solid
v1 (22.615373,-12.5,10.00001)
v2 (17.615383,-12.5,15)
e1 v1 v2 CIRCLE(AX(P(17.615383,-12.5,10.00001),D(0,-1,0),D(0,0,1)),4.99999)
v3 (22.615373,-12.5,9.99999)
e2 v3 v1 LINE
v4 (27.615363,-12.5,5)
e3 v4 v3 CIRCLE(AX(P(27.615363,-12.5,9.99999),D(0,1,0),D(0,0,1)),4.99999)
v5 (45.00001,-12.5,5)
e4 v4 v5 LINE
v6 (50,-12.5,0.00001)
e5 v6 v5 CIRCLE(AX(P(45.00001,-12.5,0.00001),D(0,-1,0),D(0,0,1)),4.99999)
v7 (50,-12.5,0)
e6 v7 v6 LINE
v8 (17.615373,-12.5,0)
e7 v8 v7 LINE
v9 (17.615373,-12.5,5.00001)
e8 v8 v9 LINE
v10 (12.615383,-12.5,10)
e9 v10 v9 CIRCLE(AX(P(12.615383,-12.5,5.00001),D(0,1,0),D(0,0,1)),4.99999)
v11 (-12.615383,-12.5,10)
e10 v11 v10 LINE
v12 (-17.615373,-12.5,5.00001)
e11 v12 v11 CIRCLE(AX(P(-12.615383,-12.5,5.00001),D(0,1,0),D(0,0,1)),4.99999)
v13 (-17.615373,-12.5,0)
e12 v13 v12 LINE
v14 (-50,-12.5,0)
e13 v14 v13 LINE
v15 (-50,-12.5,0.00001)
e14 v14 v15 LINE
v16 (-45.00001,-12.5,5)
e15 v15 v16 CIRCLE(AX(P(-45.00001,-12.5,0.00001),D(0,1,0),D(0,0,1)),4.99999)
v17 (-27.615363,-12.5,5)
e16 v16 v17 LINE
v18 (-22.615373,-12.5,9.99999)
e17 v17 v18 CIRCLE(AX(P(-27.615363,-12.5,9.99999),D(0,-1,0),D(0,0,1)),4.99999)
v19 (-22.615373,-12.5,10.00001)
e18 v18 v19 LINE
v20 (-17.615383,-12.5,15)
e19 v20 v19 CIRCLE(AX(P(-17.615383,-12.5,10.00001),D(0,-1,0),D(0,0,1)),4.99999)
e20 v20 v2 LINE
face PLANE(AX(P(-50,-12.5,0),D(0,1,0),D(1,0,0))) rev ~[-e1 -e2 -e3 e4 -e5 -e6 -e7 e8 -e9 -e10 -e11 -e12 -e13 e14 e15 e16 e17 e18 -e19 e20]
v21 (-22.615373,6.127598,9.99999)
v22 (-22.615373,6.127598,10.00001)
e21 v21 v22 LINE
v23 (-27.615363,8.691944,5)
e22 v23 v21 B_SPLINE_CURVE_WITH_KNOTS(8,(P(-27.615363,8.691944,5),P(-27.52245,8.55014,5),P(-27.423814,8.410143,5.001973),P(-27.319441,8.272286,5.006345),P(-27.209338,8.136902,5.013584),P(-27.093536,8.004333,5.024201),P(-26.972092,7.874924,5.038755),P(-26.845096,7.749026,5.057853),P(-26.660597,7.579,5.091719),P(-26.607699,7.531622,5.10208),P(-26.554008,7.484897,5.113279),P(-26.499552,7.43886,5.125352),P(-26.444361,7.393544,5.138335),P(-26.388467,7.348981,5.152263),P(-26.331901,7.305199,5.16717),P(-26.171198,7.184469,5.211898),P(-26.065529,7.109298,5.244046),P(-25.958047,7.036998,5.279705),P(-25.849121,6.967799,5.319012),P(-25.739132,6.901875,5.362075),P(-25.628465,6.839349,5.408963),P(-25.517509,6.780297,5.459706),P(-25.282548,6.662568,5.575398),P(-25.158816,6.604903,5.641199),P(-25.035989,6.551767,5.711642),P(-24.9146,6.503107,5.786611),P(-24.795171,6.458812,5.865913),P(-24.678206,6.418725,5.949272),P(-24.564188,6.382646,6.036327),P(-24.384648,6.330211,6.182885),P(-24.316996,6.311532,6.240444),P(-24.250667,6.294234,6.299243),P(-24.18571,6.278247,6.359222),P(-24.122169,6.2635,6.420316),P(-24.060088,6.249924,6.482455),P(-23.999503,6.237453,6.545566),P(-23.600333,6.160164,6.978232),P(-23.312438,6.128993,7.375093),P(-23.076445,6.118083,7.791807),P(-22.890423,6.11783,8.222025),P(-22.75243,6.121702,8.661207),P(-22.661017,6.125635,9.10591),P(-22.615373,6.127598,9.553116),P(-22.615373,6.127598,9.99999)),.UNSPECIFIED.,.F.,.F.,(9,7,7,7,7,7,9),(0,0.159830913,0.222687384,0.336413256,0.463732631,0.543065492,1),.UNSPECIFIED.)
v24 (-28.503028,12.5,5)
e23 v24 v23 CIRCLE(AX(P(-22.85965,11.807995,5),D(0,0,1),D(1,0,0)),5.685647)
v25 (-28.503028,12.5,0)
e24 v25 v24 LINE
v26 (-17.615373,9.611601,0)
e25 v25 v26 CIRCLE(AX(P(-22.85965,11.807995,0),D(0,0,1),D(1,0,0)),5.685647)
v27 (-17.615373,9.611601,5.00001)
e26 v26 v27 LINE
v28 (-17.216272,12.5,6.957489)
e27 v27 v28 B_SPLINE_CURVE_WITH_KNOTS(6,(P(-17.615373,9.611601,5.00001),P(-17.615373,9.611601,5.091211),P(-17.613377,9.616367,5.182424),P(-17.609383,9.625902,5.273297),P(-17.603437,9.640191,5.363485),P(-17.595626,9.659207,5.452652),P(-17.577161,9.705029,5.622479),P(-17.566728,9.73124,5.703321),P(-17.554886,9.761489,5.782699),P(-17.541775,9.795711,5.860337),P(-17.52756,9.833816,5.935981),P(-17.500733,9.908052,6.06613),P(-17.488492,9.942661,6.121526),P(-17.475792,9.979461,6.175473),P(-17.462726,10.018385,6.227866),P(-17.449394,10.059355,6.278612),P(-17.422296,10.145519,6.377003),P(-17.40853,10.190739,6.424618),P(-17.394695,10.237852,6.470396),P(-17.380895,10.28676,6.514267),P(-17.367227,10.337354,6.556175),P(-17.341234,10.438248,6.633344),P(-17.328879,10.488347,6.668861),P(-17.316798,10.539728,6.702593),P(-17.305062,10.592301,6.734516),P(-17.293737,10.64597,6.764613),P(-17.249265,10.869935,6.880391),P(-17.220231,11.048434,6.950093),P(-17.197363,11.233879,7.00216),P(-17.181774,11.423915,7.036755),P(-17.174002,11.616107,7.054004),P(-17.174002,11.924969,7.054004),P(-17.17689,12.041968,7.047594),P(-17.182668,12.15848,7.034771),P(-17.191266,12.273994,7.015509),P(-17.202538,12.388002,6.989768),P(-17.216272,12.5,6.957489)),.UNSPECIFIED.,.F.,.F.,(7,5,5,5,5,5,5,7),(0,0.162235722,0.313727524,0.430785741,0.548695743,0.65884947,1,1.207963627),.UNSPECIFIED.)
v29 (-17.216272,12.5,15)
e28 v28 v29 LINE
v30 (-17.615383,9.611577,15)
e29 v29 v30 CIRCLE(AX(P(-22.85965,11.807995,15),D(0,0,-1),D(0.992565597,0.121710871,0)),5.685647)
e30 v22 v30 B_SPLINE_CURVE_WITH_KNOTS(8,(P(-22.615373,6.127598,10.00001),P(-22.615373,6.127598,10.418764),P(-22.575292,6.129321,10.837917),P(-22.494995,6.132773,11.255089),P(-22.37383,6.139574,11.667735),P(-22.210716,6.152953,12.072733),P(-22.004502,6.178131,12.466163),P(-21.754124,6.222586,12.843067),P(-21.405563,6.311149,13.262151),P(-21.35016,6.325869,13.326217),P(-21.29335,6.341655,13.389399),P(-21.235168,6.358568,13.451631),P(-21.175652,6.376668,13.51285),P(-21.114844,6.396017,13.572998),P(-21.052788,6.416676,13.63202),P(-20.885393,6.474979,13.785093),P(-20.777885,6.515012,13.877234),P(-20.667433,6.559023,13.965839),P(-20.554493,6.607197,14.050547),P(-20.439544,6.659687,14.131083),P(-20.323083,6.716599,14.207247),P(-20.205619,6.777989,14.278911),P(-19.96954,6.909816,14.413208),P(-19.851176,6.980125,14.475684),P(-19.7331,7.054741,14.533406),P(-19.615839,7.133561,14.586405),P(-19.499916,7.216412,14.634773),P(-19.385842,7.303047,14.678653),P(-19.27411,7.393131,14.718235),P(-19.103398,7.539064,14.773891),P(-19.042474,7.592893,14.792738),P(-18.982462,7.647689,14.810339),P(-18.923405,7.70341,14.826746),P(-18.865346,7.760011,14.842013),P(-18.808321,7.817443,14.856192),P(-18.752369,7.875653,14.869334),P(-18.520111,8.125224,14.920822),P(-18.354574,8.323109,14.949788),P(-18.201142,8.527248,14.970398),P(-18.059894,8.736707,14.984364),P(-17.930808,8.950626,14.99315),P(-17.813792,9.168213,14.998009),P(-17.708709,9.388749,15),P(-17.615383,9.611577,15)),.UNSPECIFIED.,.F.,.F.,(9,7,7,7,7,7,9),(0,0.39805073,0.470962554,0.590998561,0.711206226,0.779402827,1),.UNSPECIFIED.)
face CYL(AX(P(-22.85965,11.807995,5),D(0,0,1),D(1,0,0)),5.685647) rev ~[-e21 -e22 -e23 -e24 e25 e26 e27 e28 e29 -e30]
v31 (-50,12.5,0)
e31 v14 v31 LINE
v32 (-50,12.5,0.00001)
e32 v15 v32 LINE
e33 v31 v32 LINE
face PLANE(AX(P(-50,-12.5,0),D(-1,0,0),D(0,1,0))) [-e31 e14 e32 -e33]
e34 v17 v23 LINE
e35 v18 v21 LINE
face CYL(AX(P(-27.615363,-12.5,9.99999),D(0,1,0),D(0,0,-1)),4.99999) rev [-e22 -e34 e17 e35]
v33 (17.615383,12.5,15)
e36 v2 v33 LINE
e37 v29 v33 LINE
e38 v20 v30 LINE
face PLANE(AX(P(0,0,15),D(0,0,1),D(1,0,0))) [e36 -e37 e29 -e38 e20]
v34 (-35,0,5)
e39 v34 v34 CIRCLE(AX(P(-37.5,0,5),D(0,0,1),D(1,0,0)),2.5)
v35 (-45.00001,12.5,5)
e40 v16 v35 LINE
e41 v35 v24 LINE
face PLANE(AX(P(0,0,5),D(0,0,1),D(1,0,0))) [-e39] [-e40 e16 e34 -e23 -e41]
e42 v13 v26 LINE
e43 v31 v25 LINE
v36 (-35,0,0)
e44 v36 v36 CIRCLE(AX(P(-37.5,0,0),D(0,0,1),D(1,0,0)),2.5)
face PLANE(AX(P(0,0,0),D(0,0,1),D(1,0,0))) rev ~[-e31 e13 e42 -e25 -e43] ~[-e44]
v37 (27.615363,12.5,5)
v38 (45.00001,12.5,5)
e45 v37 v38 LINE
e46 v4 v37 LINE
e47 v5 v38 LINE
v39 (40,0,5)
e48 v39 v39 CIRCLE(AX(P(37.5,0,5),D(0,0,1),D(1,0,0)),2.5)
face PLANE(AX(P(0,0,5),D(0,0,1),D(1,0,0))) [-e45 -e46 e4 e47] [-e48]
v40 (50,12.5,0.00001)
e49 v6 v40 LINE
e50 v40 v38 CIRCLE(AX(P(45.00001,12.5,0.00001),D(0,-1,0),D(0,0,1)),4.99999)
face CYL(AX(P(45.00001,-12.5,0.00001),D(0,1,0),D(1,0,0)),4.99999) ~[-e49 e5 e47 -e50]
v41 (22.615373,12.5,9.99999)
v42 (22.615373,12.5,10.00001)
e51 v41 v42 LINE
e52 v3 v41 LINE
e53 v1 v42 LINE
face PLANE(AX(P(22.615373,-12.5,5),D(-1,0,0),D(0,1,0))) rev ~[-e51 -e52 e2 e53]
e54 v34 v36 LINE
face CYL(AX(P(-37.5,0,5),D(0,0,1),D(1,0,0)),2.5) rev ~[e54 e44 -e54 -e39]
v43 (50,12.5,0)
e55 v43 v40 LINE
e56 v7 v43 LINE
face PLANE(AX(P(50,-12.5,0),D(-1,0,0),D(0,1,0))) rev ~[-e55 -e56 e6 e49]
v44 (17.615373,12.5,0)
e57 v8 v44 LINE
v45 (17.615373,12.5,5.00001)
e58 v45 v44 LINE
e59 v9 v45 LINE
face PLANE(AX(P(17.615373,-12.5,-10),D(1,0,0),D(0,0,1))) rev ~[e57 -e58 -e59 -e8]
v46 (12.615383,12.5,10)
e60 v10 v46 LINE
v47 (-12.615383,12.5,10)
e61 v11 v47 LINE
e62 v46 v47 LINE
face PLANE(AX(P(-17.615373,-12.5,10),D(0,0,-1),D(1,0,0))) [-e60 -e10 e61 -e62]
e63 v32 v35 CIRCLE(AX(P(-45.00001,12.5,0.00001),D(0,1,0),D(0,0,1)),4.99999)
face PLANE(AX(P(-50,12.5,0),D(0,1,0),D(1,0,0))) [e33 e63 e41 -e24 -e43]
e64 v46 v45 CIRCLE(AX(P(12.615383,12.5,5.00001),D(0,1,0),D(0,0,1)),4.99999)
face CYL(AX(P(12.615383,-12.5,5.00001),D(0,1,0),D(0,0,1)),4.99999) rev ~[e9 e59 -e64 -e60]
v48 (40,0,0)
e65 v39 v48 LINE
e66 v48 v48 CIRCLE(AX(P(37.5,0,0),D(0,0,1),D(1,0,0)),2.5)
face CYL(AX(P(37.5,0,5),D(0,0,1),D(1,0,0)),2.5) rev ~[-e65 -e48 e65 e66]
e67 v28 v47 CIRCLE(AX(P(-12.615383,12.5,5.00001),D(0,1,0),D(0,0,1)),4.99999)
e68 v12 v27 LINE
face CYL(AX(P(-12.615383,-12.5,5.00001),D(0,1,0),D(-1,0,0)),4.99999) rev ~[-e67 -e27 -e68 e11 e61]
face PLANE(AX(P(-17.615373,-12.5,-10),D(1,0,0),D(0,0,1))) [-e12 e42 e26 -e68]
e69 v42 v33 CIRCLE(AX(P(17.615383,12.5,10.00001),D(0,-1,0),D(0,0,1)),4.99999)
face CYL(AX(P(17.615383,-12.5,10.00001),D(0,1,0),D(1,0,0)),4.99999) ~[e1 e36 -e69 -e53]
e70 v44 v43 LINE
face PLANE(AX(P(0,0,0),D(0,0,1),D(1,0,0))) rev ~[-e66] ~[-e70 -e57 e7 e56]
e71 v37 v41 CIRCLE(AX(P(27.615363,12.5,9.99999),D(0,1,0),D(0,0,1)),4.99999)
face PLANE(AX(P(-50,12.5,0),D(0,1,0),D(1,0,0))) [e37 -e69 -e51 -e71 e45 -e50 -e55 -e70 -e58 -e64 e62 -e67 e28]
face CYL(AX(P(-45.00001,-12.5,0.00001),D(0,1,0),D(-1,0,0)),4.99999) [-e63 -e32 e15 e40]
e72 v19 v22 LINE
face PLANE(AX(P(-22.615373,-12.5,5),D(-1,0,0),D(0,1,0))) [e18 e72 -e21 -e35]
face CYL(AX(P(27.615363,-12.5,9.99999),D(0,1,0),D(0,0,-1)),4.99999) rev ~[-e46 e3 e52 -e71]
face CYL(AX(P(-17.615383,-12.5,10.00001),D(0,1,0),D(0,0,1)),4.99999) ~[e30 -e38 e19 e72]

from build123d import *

# Parameters (mm, degrees)
F0_W      = 100
F0_H      = 25
F1_DEPTH  = 5
F2_R      = 2.5
F3_DEPTH  = 25
F4_W      = 45.2307462692
F4_H      = 25
F5_DEPTH  = 10
F6_W      = 35.2307462692
F6_H      = 20
F7_DEPTH  = 78
F8_R      = 4.99999
F9_R      = 5.6856472889
F10_DEPTH = 12.5


# Not quite as in the source:
# - a fillet or chamfer is up to 0.001 mm smaller than in the source, because OpenCascade refuses the exact size


with BuildPart() as f1:
    # F0 (on Top) → F1 (new body)
    with BuildSketch(Plane.XY):
        Rectangle(F0_W, F0_H)
    extrude(amount=F1_DEPTH)

    # F2 (on face) → F3 (cut)
    with BuildSketch(Plane.XY.offset(5)):
        with Locations((-37.5, 0)):
            Circle(F2_R)
        with Locations((37.5, 0)):
            Circle(F2_R)
    extrude(amount=-F3_DEPTH, mode=Mode.SUBTRACT)

    # F4 (on face) → F5 (join)
    with BuildSketch(Plane.XY.offset(5)):
        Rectangle(F4_W, F4_H)
    extrude(amount=F5_DEPTH)

    # F6 (on face) → F7 (cut)
    with BuildSketch(Plane.XZ.offset(12.5)):
        Rectangle(F6_W, F6_H)
    extrude(amount=-F7_DEPTH, mode=Mode.SUBTRACT)

    # F8 (radius 5 in the source; OpenCascade refuses exactly that, so slightly less here)
    f8_edges = [f1.edges().sort_by_distance(p)[0] for p in [
        (22.615373, 0, 5),
        (-22.615373, 0, 5),
        (-22.615373, 0, 15),
        (22.615373, 0, 15),
        (50, 0, 5),
        (-50, 0, 5),
        (-17.615373, 0, 10),
        (17.615373, 0, 10),
    ]]
    fillet(f8_edges, radius=F8_R)

    # F9 (on face) → F10 (cut, symmetric)
    with BuildSketch(Plane.XY.offset(5)):
        with Locations((-22.8596497327, 11.807994917)):
            Circle(F9_R)
    extrude(amount=F10_DEPTH, both=True, mode=Mode.SUBTRACT)


solid = f1.part
